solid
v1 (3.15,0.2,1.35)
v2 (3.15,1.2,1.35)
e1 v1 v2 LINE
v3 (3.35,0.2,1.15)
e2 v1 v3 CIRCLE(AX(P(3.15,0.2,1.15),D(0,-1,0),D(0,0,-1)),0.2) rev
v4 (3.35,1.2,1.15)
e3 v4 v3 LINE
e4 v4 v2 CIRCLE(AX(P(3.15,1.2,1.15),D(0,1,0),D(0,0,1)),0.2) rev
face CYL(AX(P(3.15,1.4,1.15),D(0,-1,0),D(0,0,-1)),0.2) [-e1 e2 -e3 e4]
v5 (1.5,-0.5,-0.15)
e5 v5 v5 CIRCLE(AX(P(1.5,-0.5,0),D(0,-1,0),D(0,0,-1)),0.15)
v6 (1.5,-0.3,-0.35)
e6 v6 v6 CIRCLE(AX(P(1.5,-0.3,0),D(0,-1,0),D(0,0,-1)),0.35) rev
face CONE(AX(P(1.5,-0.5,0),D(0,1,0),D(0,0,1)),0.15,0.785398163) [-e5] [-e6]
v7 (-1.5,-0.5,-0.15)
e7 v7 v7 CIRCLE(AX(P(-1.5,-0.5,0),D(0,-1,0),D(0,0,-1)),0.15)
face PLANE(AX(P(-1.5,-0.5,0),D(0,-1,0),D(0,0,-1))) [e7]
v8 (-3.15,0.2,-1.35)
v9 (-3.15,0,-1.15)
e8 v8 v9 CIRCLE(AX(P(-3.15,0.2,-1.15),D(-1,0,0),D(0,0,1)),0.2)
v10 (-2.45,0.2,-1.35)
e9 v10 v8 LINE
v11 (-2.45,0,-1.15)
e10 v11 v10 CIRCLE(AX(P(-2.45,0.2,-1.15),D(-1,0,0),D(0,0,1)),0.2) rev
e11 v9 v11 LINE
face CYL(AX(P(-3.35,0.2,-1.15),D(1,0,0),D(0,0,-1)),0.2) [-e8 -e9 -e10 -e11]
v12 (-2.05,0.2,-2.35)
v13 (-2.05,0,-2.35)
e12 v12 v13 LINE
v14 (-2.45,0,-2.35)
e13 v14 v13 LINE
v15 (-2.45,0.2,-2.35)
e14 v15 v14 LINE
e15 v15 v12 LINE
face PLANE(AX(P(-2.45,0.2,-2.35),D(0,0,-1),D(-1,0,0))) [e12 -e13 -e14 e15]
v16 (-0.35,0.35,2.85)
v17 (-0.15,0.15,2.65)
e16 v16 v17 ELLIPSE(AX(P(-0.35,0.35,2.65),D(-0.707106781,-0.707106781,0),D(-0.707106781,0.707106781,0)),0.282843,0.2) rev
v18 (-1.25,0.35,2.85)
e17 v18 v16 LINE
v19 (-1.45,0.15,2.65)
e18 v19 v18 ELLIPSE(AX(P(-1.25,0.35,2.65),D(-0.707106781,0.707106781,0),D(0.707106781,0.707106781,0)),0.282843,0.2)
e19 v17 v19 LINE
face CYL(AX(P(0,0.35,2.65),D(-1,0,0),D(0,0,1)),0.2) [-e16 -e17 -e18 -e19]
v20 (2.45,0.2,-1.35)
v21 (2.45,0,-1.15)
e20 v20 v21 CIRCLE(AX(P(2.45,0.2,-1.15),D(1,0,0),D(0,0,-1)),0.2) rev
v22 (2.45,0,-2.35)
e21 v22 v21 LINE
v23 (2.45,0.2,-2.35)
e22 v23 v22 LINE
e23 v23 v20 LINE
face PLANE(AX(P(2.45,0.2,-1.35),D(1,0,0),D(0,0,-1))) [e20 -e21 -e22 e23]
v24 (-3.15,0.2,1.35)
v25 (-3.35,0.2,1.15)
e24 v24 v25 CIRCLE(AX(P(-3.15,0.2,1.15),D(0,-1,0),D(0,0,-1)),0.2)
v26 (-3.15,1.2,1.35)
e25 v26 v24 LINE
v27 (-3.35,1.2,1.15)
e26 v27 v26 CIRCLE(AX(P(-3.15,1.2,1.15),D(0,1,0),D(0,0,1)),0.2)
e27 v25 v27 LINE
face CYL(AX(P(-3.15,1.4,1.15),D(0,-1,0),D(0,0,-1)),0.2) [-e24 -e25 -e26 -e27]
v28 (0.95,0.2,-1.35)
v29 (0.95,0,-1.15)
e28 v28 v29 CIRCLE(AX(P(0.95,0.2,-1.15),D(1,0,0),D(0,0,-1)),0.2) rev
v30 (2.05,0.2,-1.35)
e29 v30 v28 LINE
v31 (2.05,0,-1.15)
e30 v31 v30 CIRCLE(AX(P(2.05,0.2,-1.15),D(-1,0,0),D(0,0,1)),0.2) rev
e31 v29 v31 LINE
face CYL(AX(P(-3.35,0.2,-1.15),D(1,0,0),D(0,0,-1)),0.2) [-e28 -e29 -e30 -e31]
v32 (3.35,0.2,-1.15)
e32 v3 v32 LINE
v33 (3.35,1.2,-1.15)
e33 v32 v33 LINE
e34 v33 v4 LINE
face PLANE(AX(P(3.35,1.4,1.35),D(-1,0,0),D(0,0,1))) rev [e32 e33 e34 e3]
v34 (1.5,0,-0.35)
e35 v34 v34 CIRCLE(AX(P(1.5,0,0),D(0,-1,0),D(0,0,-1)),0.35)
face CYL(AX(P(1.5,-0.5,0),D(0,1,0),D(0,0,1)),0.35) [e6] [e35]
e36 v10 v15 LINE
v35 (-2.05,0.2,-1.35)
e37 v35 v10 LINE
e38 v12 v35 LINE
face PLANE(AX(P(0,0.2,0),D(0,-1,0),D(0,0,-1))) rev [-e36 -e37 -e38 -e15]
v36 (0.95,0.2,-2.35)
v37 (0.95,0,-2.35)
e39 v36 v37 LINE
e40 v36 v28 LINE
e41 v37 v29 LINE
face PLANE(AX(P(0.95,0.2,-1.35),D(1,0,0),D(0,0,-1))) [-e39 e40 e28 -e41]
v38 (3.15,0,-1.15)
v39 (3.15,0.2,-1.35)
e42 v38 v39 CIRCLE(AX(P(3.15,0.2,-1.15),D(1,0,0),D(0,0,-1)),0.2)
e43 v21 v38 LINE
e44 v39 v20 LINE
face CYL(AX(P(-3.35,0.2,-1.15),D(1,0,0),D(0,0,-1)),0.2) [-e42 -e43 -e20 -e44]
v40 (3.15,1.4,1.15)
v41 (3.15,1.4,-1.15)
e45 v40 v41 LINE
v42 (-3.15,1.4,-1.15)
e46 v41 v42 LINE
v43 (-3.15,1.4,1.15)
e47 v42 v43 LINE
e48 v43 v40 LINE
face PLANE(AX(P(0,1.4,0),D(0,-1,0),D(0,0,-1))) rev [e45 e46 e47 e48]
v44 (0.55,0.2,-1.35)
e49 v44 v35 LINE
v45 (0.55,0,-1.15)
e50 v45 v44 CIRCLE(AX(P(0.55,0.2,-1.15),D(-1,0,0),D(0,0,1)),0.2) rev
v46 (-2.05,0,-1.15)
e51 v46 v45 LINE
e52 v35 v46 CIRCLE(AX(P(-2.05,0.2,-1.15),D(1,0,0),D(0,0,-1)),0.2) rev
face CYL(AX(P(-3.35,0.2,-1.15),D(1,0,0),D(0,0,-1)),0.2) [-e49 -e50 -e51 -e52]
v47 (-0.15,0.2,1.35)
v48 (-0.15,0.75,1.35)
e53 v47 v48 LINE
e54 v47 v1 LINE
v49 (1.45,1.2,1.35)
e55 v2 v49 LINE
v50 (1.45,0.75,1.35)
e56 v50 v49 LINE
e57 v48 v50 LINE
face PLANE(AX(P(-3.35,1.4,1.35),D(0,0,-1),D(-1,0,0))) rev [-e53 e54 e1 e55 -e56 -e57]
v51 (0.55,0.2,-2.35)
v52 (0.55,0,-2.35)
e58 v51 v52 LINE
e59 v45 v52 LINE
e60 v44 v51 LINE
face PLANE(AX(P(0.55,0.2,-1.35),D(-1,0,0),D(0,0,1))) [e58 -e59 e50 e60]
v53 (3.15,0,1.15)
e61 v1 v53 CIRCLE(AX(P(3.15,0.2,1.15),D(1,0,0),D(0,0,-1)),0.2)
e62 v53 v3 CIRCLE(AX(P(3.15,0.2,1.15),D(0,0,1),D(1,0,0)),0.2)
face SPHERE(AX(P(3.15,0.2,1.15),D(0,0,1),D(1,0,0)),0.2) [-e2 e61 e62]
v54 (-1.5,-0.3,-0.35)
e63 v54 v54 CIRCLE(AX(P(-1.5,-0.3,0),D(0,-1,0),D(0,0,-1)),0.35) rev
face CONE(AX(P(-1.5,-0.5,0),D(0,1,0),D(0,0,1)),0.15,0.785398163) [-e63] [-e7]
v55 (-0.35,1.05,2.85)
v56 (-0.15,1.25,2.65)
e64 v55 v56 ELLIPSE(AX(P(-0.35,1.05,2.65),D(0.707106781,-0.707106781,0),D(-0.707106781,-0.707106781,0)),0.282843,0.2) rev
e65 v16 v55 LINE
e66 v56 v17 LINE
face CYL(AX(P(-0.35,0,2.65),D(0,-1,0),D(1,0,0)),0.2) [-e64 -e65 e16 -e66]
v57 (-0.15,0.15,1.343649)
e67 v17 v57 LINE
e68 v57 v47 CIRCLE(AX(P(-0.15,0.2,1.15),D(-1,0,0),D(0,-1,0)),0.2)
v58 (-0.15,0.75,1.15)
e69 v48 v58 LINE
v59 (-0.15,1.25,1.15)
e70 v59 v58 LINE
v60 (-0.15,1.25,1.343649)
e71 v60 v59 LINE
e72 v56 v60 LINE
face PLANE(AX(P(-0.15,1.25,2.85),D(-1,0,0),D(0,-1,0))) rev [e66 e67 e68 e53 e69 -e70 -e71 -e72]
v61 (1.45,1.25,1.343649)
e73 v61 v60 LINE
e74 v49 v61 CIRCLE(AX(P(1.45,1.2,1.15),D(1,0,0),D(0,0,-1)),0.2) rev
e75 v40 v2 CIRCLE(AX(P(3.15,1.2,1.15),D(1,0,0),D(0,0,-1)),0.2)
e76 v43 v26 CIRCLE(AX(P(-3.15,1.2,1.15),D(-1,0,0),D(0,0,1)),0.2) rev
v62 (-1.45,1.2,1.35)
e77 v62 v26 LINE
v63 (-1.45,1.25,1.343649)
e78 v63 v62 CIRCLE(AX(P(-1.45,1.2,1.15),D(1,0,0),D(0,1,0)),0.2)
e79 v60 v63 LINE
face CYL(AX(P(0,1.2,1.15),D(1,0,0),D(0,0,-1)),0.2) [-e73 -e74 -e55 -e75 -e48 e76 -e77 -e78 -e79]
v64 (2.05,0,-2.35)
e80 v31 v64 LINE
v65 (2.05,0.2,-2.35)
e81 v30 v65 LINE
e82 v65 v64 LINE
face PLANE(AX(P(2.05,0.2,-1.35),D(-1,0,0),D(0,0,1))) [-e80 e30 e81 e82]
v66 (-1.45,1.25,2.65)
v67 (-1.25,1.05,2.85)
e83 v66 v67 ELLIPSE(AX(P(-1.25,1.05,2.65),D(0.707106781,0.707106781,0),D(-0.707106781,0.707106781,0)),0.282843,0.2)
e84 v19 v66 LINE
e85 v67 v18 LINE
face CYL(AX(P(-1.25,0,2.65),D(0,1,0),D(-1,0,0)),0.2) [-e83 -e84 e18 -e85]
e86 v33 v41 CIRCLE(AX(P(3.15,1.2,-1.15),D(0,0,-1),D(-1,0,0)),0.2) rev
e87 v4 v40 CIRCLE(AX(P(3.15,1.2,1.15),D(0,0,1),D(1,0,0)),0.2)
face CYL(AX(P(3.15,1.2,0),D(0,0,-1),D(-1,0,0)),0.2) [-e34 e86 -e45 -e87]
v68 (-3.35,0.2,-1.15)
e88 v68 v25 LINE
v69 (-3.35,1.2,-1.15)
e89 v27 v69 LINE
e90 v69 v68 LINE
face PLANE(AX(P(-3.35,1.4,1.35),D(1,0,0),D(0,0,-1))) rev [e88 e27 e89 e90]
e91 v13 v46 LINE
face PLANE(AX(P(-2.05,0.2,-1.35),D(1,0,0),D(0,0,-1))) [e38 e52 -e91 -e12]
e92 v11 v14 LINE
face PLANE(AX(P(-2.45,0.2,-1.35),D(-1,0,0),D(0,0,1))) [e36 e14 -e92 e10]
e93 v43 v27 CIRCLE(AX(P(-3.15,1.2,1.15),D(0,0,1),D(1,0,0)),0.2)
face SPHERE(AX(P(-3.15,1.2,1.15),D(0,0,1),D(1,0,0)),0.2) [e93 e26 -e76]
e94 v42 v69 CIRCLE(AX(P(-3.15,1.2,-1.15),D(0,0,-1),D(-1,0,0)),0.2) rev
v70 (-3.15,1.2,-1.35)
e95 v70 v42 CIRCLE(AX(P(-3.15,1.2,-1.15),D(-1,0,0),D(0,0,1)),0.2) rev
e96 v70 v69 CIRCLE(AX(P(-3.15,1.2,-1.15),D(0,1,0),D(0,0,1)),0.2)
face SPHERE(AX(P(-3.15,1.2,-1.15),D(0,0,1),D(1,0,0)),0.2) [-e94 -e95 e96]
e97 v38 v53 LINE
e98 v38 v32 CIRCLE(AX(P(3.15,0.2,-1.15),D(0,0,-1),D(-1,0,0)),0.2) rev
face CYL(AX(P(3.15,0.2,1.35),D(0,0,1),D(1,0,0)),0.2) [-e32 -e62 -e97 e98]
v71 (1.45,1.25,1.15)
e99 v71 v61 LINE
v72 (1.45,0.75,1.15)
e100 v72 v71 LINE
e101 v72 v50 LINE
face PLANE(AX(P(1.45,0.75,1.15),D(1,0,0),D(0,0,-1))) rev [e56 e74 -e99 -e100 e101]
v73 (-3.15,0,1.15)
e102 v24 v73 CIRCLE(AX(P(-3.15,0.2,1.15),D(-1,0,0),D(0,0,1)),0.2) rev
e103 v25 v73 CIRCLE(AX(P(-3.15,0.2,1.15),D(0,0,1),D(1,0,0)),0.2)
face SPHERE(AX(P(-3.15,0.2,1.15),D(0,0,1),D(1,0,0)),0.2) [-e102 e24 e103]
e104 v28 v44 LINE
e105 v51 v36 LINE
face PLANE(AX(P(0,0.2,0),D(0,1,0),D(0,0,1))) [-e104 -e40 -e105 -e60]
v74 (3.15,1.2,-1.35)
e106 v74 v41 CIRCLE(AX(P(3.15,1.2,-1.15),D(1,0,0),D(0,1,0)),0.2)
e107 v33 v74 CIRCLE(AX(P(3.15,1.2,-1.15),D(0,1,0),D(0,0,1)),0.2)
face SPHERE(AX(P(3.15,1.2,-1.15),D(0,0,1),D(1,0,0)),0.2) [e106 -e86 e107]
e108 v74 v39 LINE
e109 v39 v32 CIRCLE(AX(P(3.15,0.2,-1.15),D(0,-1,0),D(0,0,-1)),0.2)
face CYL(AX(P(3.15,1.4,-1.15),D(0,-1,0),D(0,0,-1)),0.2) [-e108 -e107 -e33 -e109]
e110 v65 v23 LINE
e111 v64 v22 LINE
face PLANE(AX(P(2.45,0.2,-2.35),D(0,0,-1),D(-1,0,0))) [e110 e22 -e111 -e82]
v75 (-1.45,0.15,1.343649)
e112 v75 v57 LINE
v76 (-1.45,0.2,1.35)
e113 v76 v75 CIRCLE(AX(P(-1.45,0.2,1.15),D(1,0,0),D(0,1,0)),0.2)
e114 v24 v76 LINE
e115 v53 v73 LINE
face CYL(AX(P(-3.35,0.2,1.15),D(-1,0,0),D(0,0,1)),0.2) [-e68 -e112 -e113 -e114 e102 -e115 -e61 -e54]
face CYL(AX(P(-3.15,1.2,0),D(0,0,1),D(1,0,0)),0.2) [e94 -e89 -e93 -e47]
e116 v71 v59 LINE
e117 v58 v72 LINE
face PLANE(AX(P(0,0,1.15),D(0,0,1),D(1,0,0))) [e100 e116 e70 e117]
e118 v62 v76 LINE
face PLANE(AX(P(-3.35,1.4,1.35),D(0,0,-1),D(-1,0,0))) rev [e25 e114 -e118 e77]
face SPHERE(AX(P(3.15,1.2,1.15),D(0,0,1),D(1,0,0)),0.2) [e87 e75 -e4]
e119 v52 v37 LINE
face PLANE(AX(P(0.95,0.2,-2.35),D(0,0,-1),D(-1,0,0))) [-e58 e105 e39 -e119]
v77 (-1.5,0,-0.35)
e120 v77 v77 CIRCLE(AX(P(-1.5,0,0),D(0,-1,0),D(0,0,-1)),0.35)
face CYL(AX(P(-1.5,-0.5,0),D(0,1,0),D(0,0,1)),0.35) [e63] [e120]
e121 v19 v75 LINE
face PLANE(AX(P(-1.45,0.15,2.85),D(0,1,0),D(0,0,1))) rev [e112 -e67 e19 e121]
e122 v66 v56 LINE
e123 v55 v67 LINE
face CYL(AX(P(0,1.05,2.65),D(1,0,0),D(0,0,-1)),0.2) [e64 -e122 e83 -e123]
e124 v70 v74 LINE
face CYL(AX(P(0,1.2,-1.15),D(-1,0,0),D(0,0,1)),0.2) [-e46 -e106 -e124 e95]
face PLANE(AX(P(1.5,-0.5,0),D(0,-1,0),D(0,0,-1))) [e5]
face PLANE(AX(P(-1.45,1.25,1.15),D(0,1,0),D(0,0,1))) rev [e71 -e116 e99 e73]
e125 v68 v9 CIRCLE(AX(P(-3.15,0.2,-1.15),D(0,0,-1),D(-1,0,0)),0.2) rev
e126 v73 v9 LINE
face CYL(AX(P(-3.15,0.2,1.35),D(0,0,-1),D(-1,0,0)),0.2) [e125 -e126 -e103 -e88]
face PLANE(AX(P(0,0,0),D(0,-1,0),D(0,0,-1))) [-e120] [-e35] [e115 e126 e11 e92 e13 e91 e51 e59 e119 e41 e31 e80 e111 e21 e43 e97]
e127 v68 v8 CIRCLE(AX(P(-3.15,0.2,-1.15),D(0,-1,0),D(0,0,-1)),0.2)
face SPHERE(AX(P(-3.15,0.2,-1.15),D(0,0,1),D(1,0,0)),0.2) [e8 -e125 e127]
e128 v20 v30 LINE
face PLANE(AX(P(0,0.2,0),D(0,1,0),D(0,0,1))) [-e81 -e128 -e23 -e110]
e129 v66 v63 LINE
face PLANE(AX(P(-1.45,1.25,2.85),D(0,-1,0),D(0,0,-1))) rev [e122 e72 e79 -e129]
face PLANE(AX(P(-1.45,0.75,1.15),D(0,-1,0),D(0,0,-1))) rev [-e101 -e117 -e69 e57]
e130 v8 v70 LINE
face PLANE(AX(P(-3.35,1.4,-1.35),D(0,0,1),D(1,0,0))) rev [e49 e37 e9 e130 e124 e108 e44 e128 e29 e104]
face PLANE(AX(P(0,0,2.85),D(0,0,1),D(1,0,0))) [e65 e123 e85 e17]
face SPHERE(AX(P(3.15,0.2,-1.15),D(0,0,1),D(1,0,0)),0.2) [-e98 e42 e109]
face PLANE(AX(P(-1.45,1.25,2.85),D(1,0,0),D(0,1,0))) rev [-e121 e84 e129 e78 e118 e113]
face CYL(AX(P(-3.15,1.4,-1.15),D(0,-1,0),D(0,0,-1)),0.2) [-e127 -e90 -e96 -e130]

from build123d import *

# Parameters (mm, degrees)
SKETCH_1_W          = 6.7
SKETCH_1_H          = 2.7
EXTRUDE_1_DEPTH     = 1.4
SKETCH_2_W          = 2.9
SKETCH_2_H          = 0.5
CUT_EXTRUDE_1_DEPTH = 0.2
SKETCH_3_W          = 1.3
SKETCH_3_H          = 1.1
EXTRUDE_2_DEPTH     = 1.7
SKETCH_4_W          = 0.4
SKETCH_4_H          = 1
EXTRUDE_3_DEPTH     = 0.2
SKETCH_6_R          = 0.35
EXTRUDE_4_DEPTH     = 0.5
FILLET_1_R          = 0.2
CHAMFER_1_SIZE      = 0.2


with BuildPart() as part:
    # Эскиз1 → Бобышка-Вытянуть1 (new body)
    with BuildSketch(Plane(origin=(0, 0, 0), x_dir=(1, 0, 0), z_dir=(0, 1, 0))):
        Rectangle(SKETCH_1_W, SKETCH_1_H)
    extrude(amount=EXTRUDE_1_DEPTH)

    # Эскиз2 → Вырез-Вытянуть1 (cut)
    with BuildSketch(Plane.XY.offset(1.35)):
        with Locations((0, 1)):
            Rectangle(SKETCH_2_W, SKETCH_2_H)
    extrude(amount=-CUT_EXTRUDE_1_DEPTH, mode=Mode.SUBTRACT)

    # Эскиз3 → Бобышка-Вытянуть2 (add)
    with BuildSketch(Plane.XY.offset(1.15)):
        with Locations((-0.8, 0.7)):
            Rectangle(SKETCH_3_W, SKETCH_3_H)
    extrude(amount=EXTRUDE_2_DEPTH)

    # Эскиз4 → Бобышка-Вытянуть3 (add)
    with BuildSketch(Plane.XZ):
        with Locations((-2.25, -1.85)):
            Rectangle(SKETCH_4_W, SKETCH_4_H)
        with Locations((0.75, -1.85)):
            Rectangle(SKETCH_4_W, SKETCH_4_H)
        with Locations((2.25, -1.85)):
            Rectangle(SKETCH_4_W, SKETCH_4_H)
    extrude(amount=-EXTRUDE_3_DEPTH)

    # Эскиз6 → Бобышка-Вытянуть4 (add)
    with BuildSketch(Plane.XZ):
        with Locations(Location((-1.5, 0, 0), (0, 0, 270))):
            Circle(SKETCH_6_R)
        with Locations(Location((1.5, 0, 0), (0, 0, 270))):
            Circle(SKETCH_6_R)
    extrude(amount=EXTRUDE_4_DEPTH)

    # Скругление1
    # the kernel refuses this fillet: 0.2 mm, written as the material it takes off along each edge
    with BuildSketch(Plane(origin=(3.15, 0.2, 1.15), x_dir=(1, 0, 0), z_dir=(0, 0, 1))) as fillet_1_piece_1_section:
        Polygon((0, 0), (FILLET_1_R * 1.02, 0), (FILLET_1_R * 1.02, -FILLET_1_R * 1.02), (0, -FILLET_1_R * 1.02), align=None)
    fillet_1_piece_1 = extrude(amount=FILLET_1_R * 1.02, mode=Mode.PRIVATE)
    fillet_1_piece_1 = fillet_1_piece_1 - Plane(origin=(3.15, 0.2, 1.15), x_dir=(-0.7071067811865475, 0.7071067811865475, 0), z_dir=(0, 0, 1)) * Sphere(FILLET_1_R, mode=Mode.PRIVATE)
    add(fillet_1_piece_1, mode=Mode.SUBTRACT)
    with BuildSketch(Plane(origin=(3.15, 1.2, 1.15), x_dir=(0, 1, 0), z_dir=(0, 0, 1))) as fillet_1_piece_2_section:
        Polygon((0, 0), (FILLET_1_R * 1.02, 0), (FILLET_1_R * 1.02, -FILLET_1_R * 1.02), (0, -FILLET_1_R * 1.02), align=None)
    fillet_1_piece_2 = extrude(amount=FILLET_1_R * 1.02, mode=Mode.PRIVATE)
    fillet_1_piece_2 = fillet_1_piece_2 - Plane(origin=(3.15, 1.2, 1.15), x_dir=(-0.7071067811865475, -0.7071067811865475, 0), z_dir=(0, 0, 1)) * Sphere(FILLET_1_R, mode=Mode.PRIVATE)
    add(fillet_1_piece_2, mode=Mode.SUBTRACT)
    with BuildSketch(Plane(origin=(3.15, 1.2, -1.15), x_dir=(1, 0, 0), z_dir=(0, 1, 0))) as fillet_1_piece_3_section:
        Polygon((0, 0), (FILLET_1_R * 1.02, 0), (FILLET_1_R * 1.02, FILLET_1_R * 1.02), (0, FILLET_1_R * 1.02), align=None)
    fillet_1_piece_3 = extrude(amount=FILLET_1_R * 1.02, mode=Mode.PRIVATE)
    fillet_1_piece_3 = fillet_1_piece_3 - Plane(origin=(3.15, 1.2, -1.15), x_dir=(-0.7071067811865475, 0, 0.7071067811865475), z_dir=(0, 1, 0)) * Sphere(FILLET_1_R, mode=Mode.PRIVATE)
    add(fillet_1_piece_3, mode=Mode.SUBTRACT)
    with BuildSketch(Plane(origin=(3.15, 0.2, -1.15), x_dir=(0, 0, -1), z_dir=(1, 0, 0))) as fillet_1_piece_4_section:
        Polygon((0, 0), (FILLET_1_R * 1.02, 0), (FILLET_1_R * 1.02, -FILLET_1_R * 1.02), (0, -FILLET_1_R * 1.02), align=None)
    fillet_1_piece_4 = extrude(amount=FILLET_1_R * 1.02, mode=Mode.PRIVATE)
    fillet_1_piece_4 = fillet_1_piece_4 - Plane(origin=(3.15, 0.2, -1.15), x_dir=(0, 0.7071067811865475, 0.7071067811865475), z_dir=(1, 0, 0)) * Sphere(FILLET_1_R, mode=Mode.PRIVATE)
    add(fillet_1_piece_4, mode=Mode.SUBTRACT)
    with BuildSketch(Plane(origin=(-3.15, 0.2, -1.15), x_dir=(0, 0, -1), z_dir=(-1, 0, 0))) as fillet_1_piece_5_section:
        Polygon((0, 0), (FILLET_1_R * 1.02, 0), (FILLET_1_R * 1.02, FILLET_1_R * 1.02), (0, FILLET_1_R * 1.02), align=None)
    fillet_1_piece_5 = extrude(amount=FILLET_1_R * 1.02, mode=Mode.PRIVATE)
    fillet_1_piece_5 = fillet_1_piece_5 - Plane(origin=(-3.15, 0.2, -1.15), x_dir=(0, 0.7071067811865475, 0.7071067811865475), z_dir=(-1, 0, 0)) * Sphere(FILLET_1_R, mode=Mode.PRIVATE)
    add(fillet_1_piece_5, mode=Mode.SUBTRACT)
    with BuildSketch(Plane(origin=(-3.15, 1.2, -1.15), x_dir=(0, 1, 0), z_dir=(-1, 0, 0))) as fillet_1_piece_6_section:
        Polygon((0, 0), (FILLET_1_R * 1.02, 0), (FILLET_1_R * 1.02, FILLET_1_R * 1.02), (0, FILLET_1_R * 1.02), align=None)
    fillet_1_piece_6 = extrude(amount=FILLET_1_R * 1.02, mode=Mode.PRIVATE)
    fillet_1_piece_6 = fillet_1_piece_6 - Plane(origin=(-3.15, 1.2, -1.15), x_dir=(0, -0.7071067811865475, 0.7071067811865475), z_dir=(-1, 0, 0)) * Sphere(FILLET_1_R, mode=Mode.PRIVATE)
    add(fillet_1_piece_6, mode=Mode.SUBTRACT)
    with BuildSketch(Plane(origin=(-3.15, 1.2, 1.15), x_dir=(-1, 0, 0), z_dir=(0, 0, 1))) as fillet_1_piece_7_section:
        Polygon((0, 0), (FILLET_1_R * 1.02, 0), (FILLET_1_R * 1.02, -FILLET_1_R * 1.02), (0, -FILLET_1_R * 1.02), align=None)
    fillet_1_piece_7 = extrude(amount=FILLET_1_R * 1.02, mode=Mode.PRIVATE)
    fillet_1_piece_7 = fillet_1_piece_7 - Plane(origin=(-3.15, 1.2, 1.15), x_dir=(0.7071067811865475, -0.7071067811865475, 0), z_dir=(0, 0, 1)) * Sphere(FILLET_1_R, mode=Mode.PRIVATE)
    add(fillet_1_piece_7, mode=Mode.SUBTRACT)
    with BuildSketch(Plane(origin=(-3.15, 0.2, 1.15), x_dir=(-1, 0, 0), z_dir=(0, 0, 1))) as fillet_1_piece_8_section:
        Polygon((0, 0), (FILLET_1_R * 1.02, 0), (FILLET_1_R * 1.02, FILLET_1_R * 1.02), (0, FILLET_1_R * 1.02), align=None)
    fillet_1_piece_8 = extrude(amount=FILLET_1_R * 1.02, mode=Mode.PRIVATE)
    fillet_1_piece_8 = fillet_1_piece_8 - Plane(origin=(-3.15, 0.2, 1.15), x_dir=(0.7071067811865475, 0.7071067811865475, 0), z_dir=(0, 0, 1)) * Sphere(FILLET_1_R, mode=Mode.PRIVATE)
    add(fillet_1_piece_8, mode=Mode.SUBTRACT)
    with BuildSketch(Plane(origin=(3.35, 0.2, 1.35), x_dir=(-1, 0, 0), z_dir=(0, 1, 0)), Plane(origin=(3.35, 0.2, -1.35), x_dir=(0, 0, 1), z_dir=(0, 1, 0))) as fillet_1_piece_9:
        with BuildLine():
            CenterArc((FILLET_1_R, -FILLET_1_R), FILLET_1_R, 90, 90)
            Line((0, -FILLET_1_R), (0, 0))
            Line((0, 0), (FILLET_1_R, 0))
        make_face()
    extrude(amount=1, mode=Mode.SUBTRACT)
    with BuildSketch(Plane(origin=(3.35, 1.4, 1.15), x_dir=(-1, 0, 0), z_dir=(0, 0, -1)), Plane(origin=(3.35, 0, 1.15), x_dir=(0, 1, 0), z_dir=(0, 0, -1)), Plane(origin=(-3.35, 0, -1.15), x_dir=(0, 1, 0), z_dir=(0, 0, 1)), Plane(origin=(-1.95, 1.25, 2.85), x_dir=(0, 0, -1), z_dir=(1, 0, 0)), Plane(origin=(0.35, 0.15, 2.85), x_dir=(0, 0, -1), z_dir=(-1, 0, 0))) as fillet_1_piece_10:
        with BuildLine():
            CenterArc((FILLET_1_R, -FILLET_1_R), FILLET_1_R, 90, 90)
            Line((0, -FILLET_1_R), (0, 0))
            Line((0, 0), (FILLET_1_R, 0))
        make_face()
    extrude(amount=2.3, mode=Mode.SUBTRACT)
    with BuildSketch(Plane(origin=(-3.35, 0.2, -1.35), x_dir=(0, 0, 1), z_dir=(0, 1, 0)), Plane(origin=(-3.35, 0.2, 1.35), x_dir=(1, 0, 0), z_dir=(0, 1, 0))) as fillet_1_piece_11:
        with BuildLine():
            CenterArc((FILLET_1_R, FILLET_1_R), FILLET_1_R, 180, 90)
            Line((0, FILLET_1_R), (0, 0))
            Line((0, 0), (FILLET_1_R, 0))
        make_face()
    extrude(amount=1, mode=Mode.SUBTRACT)
    with BuildSketch(Plane(origin=(-3.35, 1.4, -1.15), x_dir=(0, -1, 0), z_dir=(0, 0, 1))) as fillet_1_piece_12:
        with BuildLine():
            CenterArc((FILLET_1_R, FILLET_1_R), FILLET_1_R, 180, 90)
            Line((0, FILLET_1_R), (0, 0))
            Line((0, 0), (FILLET_1_R, 0))
        make_face()
    extrude(amount=2.3, mode=Mode.SUBTRACT)
    with BuildSketch(Plane(origin=(3.15, 0, -1.35), x_dir=(0, 0, 1), z_dir=(-1, 0, 0)), Plane(origin=(-2.45, 0, -1.35), x_dir=(0, 0, 1), z_dir=(-1, 0, 0))) as fillet_1_piece_13:
        with BuildLine():
            CenterArc((FILLET_1_R, FILLET_1_R), FILLET_1_R, 180, 90)
            Line((0, FILLET_1_R), (0, 0))
            Line((0, 0), (FILLET_1_R, 0))
        make_face()
    extrude(amount=0.7, mode=Mode.SUBTRACT)
    with BuildSketch(Plane(origin=(3.15, 0, -1.35), x_dir=(0, 0, 1), z_dir=(-1, 0, 0))) as fillet_1_piece_14_section:
        with BuildLine():
            CenterArc((FILLET_1_R, FILLET_1_R), FILLET_1_R, 180, 90)
            Line((0, FILLET_1_R), (0, 0))
            Line((0, 0), (FILLET_1_R, 0))
        make_face()
    fillet_1_piece_14 = extrude(amount=1.2, mode=Mode.PRIVATE)
    fillet_1_piece_14 = split(fillet_1_piece_14, bisect_by=Plane(origin=(2.05, 0.044673588, -1.305326412), z_dir=(-1, 0, 0)), keep=Keep.TOP, mode=Mode.PRIVATE)
    add(fillet_1_piece_14, mode=Mode.SUBTRACT)
    with BuildSketch(Plane(origin=(2.55, 0, -1.35), x_dir=(0, 0, 1), z_dir=(-1, 0, 0))) as fillet_1_piece_15_section:
        with BuildLine():
            CenterArc((FILLET_1_R, FILLET_1_R), FILLET_1_R, 180, 90)
            Line((0, FILLET_1_R), (0, 0))
            Line((0, 0), (FILLET_1_R, 0))
        make_face()
    fillet_1_piece_15 = extrude(amount=2.1, mode=Mode.PRIVATE)
    fillet_1_piece_15 = split(fillet_1_piece_15, bisect_by=Plane(origin=(2.45, 0.044673588, -1.305326412), z_dir=(1, 0, 0)), keep=Keep.TOP, mode=Mode.PRIVATE)
    add(fillet_1_piece_15, mode=Mode.SUBTRACT)
    with BuildSketch(Plane(origin=(2.05, 0, -1.35), x_dir=(0, 0, 1), z_dir=(-1, 0, 0))) as fillet_1_piece_16:
        with BuildLine():
            CenterArc((FILLET_1_R, FILLET_1_R), FILLET_1_R, 180, 90)
            Line((0, FILLET_1_R), (0, 0))
            Line((0, 0), (FILLET_1_R, 0))
        make_face()
    extrude(amount=1.1, mode=Mode.SUBTRACT)
    with BuildSketch(Plane(origin=(2.55, 0, -1.35), x_dir=(0, 0, 1), z_dir=(-1, 0, 0))) as fillet_1_piece_17_section:
        with BuildLine():
            CenterArc((FILLET_1_R, FILLET_1_R), FILLET_1_R, 180, 90)
            Line((0, FILLET_1_R), (0, 0))
            Line((0, 0), (FILLET_1_R, 0))
        make_face()
    fillet_1_piece_17 = extrude(amount=2.1, mode=Mode.PRIVATE)
    fillet_1_piece_17 = split(fillet_1_piece_17, bisect_by=Plane(origin=(0.55, 0.044673588, -1.305326412), z_dir=(-1, 0, 0)), keep=Keep.TOP, mode=Mode.PRIVATE)
    add(fillet_1_piece_17, mode=Mode.SUBTRACT)
    with BuildSketch(Plane(origin=(1.05, 0, -1.35), x_dir=(0, 0, 1), z_dir=(-1, 0, 0))) as fillet_1_piece_18_section:
        with BuildLine():
            CenterArc((FILLET_1_R, FILLET_1_R), FILLET_1_R, 180, 90)
            Line((0, FILLET_1_R), (0, 0))
            Line((0, 0), (FILLET_1_R, 0))
        make_face()
    fillet_1_piece_18 = extrude(amount=3.6, mode=Mode.PRIVATE)
    fillet_1_piece_18 = split(fillet_1_piece_18, bisect_by=Plane(origin=(0.95, 0.044673588, -1.305326412), z_dir=(1, 0, 0)), keep=Keep.TOP, mode=Mode.PRIVATE)
    add(fillet_1_piece_18, mode=Mode.SUBTRACT)
    with BuildSketch(Plane(origin=(0.55, 0, -1.35), x_dir=(0, 0, 1), z_dir=(-1, 0, 0))) as fillet_1_piece_19:
        with BuildLine():
            CenterArc((FILLET_1_R, FILLET_1_R), FILLET_1_R, 180, 90)
            Line((0, FILLET_1_R), (0, 0))
            Line((0, 0), (FILLET_1_R, 0))
        make_face()
    extrude(amount=2.6, mode=Mode.SUBTRACT)
    with BuildSketch(Plane(origin=(1.05, 0, -1.35), x_dir=(0, 0, 1), z_dir=(-1, 0, 0))) as fillet_1_piece_20_section:
        with BuildLine():
            CenterArc((FILLET_1_R, FILLET_1_R), FILLET_1_R, 180, 90)
            Line((0, FILLET_1_R), (0, 0))
            Line((0, 0), (FILLET_1_R, 0))
        make_face()
    fillet_1_piece_20 = extrude(amount=3.6, mode=Mode.PRIVATE)
    fillet_1_piece_20 = split(fillet_1_piece_20, bisect_by=Plane(origin=(-2.45, 0.044673588, -1.305326412), z_dir=(-1, 0, 0)), keep=Keep.TOP, mode=Mode.PRIVATE)
    add(fillet_1_piece_20, mode=Mode.SUBTRACT)
    with BuildSketch(Plane(origin=(-1.95, 0, -1.35), x_dir=(0, 0, 1), z_dir=(-1, 0, 0))) as fillet_1_piece_21_section:
        with BuildLine():
            CenterArc((FILLET_1_R, FILLET_1_R), FILLET_1_R, 180, 90)
            Line((0, FILLET_1_R), (0, 0))
            Line((0, 0), (FILLET_1_R, 0))
        make_face()
    fillet_1_piece_21 = extrude(amount=1.2, mode=Mode.PRIVATE)
    fillet_1_piece_21 = split(fillet_1_piece_21, bisect_by=Plane(origin=(-2.05, 0.044673588, -1.305326412), z_dir=(1, 0, 0)), keep=Keep.TOP, mode=Mode.PRIVATE)
    add(fillet_1_piece_21, mode=Mode.SUBTRACT)
    with BuildSketch(Plane(origin=(3.15, 1.4, -1.35), x_dir=(0, 0, 1), z_dir=(-1, 0, 0))) as fillet_1_piece_22:
        with BuildLine():
            CenterArc((FILLET_1_R, -FILLET_1_R), FILLET_1_R, 90, 90)
            Line((0, -FILLET_1_R), (0, 0))
            Line((0, 0), (FILLET_1_R, 0))
        make_face()
    extrude(amount=6.3, mode=Mode.SUBTRACT)
    with BuildSketch(Plane(origin=(-3.15, 1.4, 1.35), x_dir=(0, -1, 0), z_dir=(1, 0, 0))) as fillet_1_piece_23_section:
        with BuildLine():
            CenterArc((FILLET_1_R, FILLET_1_R), FILLET_1_R, 180, 90)
            Line((0, FILLET_1_R), (0, 0))
            Line((0, 0), (FILLET_1_R, 0))
        make_face()
    fillet_1_piece_23 = extrude(amount=6.3, mode=Mode.PRIVATE)
    fillet_1_piece_23 = split(fillet_1_piece_23, bisect_by=Plane(origin=(-1.45, 1.237540036, 1.34810005), z_dir=(-1, 0, 0)), keep=Keep.TOP, mode=Mode.PRIVATE)
    add(fillet_1_piece_23, mode=Mode.SUBTRACT)
    with BuildSketch(Plane(origin=(-3.15, 1.4, 1.35), x_dir=(0, -1, 0), z_dir=(1, 0, 0))) as fillet_1_piece_24_section:
        with BuildLine():
            CenterArc((FILLET_1_R, FILLET_1_R), FILLET_1_R, 180, 90)
            Line((0, FILLET_1_R), (0, 0))
            Line((0, 0), (FILLET_1_R, 0))
        make_face()
    fillet_1_piece_24 = extrude(amount=6.3, mode=Mode.PRIVATE)
    fillet_1_piece_24 = split(fillet_1_piece_24, bisect_by=Plane(origin=(-0.8, 1.25, 1.304795882), z_dir=(0, 1, 0)), keep=Keep.TOP, mode=Mode.PRIVATE)
    add(fillet_1_piece_24, mode=Mode.SUBTRACT)
    with BuildSketch(Plane(origin=(-3.15, 1.4, 1.35), x_dir=(0, -1, 0), z_dir=(1, 0, 0))) as fillet_1_piece_25_section:
        with BuildLine():
            CenterArc((FILLET_1_R, FILLET_1_R), FILLET_1_R, 180, 90)
            Line((0, FILLET_1_R), (0, 0))
            Line((0, 0), (FILLET_1_R, 0))
        make_face()
    fillet_1_piece_25 = extrude(amount=6.3, mode=Mode.PRIVATE)
    fillet_1_piece_25 = split(fillet_1_piece_25, bisect_by=Plane(origin=(-0.15, 1.237540036, 1.34810005), z_dir=(1, 0, 0)), keep=Keep.TOP, mode=Mode.PRIVATE)
    add(fillet_1_piece_25, mode=Mode.SUBTRACT)
    with BuildSketch(Plane(origin=(-3.15, 0, 1.35), x_dir=(0, 1, 0), z_dir=(1, 0, 0))) as fillet_1_piece_26_section:
        with BuildLine():
            CenterArc((FILLET_1_R, -FILLET_1_R), FILLET_1_R, 90, 90)
            Line((0, -FILLET_1_R), (0, 0))
            Line((0, 0), (FILLET_1_R, 0))
        make_face()
    fillet_1_piece_26 = extrude(amount=6.3, mode=Mode.PRIVATE)
    fillet_1_piece_26 = split(fillet_1_piece_26, bisect_by=Plane(origin=(-1.45, 0.162459964, 1.34810005), z_dir=(-1, 0, 0)), keep=Keep.TOP, mode=Mode.PRIVATE)
    add(fillet_1_piece_26, mode=Mode.SUBTRACT)
    with BuildSketch(Plane(origin=(-3.15, 0, 1.35), x_dir=(0, 1, 0), z_dir=(1, 0, 0))) as fillet_1_piece_27_section:
        with BuildLine():
            CenterArc((FILLET_1_R, -FILLET_1_R), FILLET_1_R, 90, 90)
            Line((0, -FILLET_1_R), (0, 0))
            Line((0, 0), (FILLET_1_R, 0))
        make_face()
    fillet_1_piece_27 = extrude(amount=6.3, mode=Mode.PRIVATE)
    fillet_1_piece_27 = split(fillet_1_piece_27, bisect_by=Plane(origin=(-0.8, 0.15, 1.304795882), z_dir=(0, -1, 0)), keep=Keep.TOP, mode=Mode.PRIVATE)
    add(fillet_1_piece_27, mode=Mode.SUBTRACT)
    with BuildSketch(Plane(origin=(-3.15, 0, 1.35), x_dir=(0, 1, 0), z_dir=(1, 0, 0))) as fillet_1_piece_28_section:
        with BuildLine():
            CenterArc((FILLET_1_R, -FILLET_1_R), FILLET_1_R, 90, 90)
            Line((0, -FILLET_1_R), (0, 0))
            Line((0, 0), (FILLET_1_R, 0))
        make_face()
    fillet_1_piece_28 = extrude(amount=6.3, mode=Mode.PRIVATE)
    fillet_1_piece_28 = split(fillet_1_piece_28, bisect_by=Plane(origin=(-0.15, 0.162459964, 1.34810005), z_dir=(1, 0, 0)), keep=Keep.TOP, mode=Mode.PRIVATE)
    add(fillet_1_piece_28, mode=Mode.SUBTRACT)
    with BuildSketch(Plane(origin=(-0.15, 1.75, 2.85), x_dir=(0, 0, -1), z_dir=(0, -1, 0)), Plane(origin=(-1.45, -0.35, 2.85), x_dir=(0, 0, -1), z_dir=(0, 1, 0))) as fillet_1_piece_29:
        with BuildLine():
            CenterArc((FILLET_1_R, -FILLET_1_R), FILLET_1_R, 90, 90)
            Line((0, -FILLET_1_R), (0, 0))
            Line((0, 0), (FILLET_1_R, 0))
        make_face()
    extrude(amount=2.1, mode=Mode.SUBTRACT)

    # Фаска1
    chamfer_1_edges = [part.edges().sort_by_distance(p)[0] for p in [
        (-1.5, -0.5, 0.35),
        (1.5, -0.5, 0.35),
    ]]
    chamfer(chamfer_1_edges, length=CHAMFER_1_SIZE)


solid = part.part
